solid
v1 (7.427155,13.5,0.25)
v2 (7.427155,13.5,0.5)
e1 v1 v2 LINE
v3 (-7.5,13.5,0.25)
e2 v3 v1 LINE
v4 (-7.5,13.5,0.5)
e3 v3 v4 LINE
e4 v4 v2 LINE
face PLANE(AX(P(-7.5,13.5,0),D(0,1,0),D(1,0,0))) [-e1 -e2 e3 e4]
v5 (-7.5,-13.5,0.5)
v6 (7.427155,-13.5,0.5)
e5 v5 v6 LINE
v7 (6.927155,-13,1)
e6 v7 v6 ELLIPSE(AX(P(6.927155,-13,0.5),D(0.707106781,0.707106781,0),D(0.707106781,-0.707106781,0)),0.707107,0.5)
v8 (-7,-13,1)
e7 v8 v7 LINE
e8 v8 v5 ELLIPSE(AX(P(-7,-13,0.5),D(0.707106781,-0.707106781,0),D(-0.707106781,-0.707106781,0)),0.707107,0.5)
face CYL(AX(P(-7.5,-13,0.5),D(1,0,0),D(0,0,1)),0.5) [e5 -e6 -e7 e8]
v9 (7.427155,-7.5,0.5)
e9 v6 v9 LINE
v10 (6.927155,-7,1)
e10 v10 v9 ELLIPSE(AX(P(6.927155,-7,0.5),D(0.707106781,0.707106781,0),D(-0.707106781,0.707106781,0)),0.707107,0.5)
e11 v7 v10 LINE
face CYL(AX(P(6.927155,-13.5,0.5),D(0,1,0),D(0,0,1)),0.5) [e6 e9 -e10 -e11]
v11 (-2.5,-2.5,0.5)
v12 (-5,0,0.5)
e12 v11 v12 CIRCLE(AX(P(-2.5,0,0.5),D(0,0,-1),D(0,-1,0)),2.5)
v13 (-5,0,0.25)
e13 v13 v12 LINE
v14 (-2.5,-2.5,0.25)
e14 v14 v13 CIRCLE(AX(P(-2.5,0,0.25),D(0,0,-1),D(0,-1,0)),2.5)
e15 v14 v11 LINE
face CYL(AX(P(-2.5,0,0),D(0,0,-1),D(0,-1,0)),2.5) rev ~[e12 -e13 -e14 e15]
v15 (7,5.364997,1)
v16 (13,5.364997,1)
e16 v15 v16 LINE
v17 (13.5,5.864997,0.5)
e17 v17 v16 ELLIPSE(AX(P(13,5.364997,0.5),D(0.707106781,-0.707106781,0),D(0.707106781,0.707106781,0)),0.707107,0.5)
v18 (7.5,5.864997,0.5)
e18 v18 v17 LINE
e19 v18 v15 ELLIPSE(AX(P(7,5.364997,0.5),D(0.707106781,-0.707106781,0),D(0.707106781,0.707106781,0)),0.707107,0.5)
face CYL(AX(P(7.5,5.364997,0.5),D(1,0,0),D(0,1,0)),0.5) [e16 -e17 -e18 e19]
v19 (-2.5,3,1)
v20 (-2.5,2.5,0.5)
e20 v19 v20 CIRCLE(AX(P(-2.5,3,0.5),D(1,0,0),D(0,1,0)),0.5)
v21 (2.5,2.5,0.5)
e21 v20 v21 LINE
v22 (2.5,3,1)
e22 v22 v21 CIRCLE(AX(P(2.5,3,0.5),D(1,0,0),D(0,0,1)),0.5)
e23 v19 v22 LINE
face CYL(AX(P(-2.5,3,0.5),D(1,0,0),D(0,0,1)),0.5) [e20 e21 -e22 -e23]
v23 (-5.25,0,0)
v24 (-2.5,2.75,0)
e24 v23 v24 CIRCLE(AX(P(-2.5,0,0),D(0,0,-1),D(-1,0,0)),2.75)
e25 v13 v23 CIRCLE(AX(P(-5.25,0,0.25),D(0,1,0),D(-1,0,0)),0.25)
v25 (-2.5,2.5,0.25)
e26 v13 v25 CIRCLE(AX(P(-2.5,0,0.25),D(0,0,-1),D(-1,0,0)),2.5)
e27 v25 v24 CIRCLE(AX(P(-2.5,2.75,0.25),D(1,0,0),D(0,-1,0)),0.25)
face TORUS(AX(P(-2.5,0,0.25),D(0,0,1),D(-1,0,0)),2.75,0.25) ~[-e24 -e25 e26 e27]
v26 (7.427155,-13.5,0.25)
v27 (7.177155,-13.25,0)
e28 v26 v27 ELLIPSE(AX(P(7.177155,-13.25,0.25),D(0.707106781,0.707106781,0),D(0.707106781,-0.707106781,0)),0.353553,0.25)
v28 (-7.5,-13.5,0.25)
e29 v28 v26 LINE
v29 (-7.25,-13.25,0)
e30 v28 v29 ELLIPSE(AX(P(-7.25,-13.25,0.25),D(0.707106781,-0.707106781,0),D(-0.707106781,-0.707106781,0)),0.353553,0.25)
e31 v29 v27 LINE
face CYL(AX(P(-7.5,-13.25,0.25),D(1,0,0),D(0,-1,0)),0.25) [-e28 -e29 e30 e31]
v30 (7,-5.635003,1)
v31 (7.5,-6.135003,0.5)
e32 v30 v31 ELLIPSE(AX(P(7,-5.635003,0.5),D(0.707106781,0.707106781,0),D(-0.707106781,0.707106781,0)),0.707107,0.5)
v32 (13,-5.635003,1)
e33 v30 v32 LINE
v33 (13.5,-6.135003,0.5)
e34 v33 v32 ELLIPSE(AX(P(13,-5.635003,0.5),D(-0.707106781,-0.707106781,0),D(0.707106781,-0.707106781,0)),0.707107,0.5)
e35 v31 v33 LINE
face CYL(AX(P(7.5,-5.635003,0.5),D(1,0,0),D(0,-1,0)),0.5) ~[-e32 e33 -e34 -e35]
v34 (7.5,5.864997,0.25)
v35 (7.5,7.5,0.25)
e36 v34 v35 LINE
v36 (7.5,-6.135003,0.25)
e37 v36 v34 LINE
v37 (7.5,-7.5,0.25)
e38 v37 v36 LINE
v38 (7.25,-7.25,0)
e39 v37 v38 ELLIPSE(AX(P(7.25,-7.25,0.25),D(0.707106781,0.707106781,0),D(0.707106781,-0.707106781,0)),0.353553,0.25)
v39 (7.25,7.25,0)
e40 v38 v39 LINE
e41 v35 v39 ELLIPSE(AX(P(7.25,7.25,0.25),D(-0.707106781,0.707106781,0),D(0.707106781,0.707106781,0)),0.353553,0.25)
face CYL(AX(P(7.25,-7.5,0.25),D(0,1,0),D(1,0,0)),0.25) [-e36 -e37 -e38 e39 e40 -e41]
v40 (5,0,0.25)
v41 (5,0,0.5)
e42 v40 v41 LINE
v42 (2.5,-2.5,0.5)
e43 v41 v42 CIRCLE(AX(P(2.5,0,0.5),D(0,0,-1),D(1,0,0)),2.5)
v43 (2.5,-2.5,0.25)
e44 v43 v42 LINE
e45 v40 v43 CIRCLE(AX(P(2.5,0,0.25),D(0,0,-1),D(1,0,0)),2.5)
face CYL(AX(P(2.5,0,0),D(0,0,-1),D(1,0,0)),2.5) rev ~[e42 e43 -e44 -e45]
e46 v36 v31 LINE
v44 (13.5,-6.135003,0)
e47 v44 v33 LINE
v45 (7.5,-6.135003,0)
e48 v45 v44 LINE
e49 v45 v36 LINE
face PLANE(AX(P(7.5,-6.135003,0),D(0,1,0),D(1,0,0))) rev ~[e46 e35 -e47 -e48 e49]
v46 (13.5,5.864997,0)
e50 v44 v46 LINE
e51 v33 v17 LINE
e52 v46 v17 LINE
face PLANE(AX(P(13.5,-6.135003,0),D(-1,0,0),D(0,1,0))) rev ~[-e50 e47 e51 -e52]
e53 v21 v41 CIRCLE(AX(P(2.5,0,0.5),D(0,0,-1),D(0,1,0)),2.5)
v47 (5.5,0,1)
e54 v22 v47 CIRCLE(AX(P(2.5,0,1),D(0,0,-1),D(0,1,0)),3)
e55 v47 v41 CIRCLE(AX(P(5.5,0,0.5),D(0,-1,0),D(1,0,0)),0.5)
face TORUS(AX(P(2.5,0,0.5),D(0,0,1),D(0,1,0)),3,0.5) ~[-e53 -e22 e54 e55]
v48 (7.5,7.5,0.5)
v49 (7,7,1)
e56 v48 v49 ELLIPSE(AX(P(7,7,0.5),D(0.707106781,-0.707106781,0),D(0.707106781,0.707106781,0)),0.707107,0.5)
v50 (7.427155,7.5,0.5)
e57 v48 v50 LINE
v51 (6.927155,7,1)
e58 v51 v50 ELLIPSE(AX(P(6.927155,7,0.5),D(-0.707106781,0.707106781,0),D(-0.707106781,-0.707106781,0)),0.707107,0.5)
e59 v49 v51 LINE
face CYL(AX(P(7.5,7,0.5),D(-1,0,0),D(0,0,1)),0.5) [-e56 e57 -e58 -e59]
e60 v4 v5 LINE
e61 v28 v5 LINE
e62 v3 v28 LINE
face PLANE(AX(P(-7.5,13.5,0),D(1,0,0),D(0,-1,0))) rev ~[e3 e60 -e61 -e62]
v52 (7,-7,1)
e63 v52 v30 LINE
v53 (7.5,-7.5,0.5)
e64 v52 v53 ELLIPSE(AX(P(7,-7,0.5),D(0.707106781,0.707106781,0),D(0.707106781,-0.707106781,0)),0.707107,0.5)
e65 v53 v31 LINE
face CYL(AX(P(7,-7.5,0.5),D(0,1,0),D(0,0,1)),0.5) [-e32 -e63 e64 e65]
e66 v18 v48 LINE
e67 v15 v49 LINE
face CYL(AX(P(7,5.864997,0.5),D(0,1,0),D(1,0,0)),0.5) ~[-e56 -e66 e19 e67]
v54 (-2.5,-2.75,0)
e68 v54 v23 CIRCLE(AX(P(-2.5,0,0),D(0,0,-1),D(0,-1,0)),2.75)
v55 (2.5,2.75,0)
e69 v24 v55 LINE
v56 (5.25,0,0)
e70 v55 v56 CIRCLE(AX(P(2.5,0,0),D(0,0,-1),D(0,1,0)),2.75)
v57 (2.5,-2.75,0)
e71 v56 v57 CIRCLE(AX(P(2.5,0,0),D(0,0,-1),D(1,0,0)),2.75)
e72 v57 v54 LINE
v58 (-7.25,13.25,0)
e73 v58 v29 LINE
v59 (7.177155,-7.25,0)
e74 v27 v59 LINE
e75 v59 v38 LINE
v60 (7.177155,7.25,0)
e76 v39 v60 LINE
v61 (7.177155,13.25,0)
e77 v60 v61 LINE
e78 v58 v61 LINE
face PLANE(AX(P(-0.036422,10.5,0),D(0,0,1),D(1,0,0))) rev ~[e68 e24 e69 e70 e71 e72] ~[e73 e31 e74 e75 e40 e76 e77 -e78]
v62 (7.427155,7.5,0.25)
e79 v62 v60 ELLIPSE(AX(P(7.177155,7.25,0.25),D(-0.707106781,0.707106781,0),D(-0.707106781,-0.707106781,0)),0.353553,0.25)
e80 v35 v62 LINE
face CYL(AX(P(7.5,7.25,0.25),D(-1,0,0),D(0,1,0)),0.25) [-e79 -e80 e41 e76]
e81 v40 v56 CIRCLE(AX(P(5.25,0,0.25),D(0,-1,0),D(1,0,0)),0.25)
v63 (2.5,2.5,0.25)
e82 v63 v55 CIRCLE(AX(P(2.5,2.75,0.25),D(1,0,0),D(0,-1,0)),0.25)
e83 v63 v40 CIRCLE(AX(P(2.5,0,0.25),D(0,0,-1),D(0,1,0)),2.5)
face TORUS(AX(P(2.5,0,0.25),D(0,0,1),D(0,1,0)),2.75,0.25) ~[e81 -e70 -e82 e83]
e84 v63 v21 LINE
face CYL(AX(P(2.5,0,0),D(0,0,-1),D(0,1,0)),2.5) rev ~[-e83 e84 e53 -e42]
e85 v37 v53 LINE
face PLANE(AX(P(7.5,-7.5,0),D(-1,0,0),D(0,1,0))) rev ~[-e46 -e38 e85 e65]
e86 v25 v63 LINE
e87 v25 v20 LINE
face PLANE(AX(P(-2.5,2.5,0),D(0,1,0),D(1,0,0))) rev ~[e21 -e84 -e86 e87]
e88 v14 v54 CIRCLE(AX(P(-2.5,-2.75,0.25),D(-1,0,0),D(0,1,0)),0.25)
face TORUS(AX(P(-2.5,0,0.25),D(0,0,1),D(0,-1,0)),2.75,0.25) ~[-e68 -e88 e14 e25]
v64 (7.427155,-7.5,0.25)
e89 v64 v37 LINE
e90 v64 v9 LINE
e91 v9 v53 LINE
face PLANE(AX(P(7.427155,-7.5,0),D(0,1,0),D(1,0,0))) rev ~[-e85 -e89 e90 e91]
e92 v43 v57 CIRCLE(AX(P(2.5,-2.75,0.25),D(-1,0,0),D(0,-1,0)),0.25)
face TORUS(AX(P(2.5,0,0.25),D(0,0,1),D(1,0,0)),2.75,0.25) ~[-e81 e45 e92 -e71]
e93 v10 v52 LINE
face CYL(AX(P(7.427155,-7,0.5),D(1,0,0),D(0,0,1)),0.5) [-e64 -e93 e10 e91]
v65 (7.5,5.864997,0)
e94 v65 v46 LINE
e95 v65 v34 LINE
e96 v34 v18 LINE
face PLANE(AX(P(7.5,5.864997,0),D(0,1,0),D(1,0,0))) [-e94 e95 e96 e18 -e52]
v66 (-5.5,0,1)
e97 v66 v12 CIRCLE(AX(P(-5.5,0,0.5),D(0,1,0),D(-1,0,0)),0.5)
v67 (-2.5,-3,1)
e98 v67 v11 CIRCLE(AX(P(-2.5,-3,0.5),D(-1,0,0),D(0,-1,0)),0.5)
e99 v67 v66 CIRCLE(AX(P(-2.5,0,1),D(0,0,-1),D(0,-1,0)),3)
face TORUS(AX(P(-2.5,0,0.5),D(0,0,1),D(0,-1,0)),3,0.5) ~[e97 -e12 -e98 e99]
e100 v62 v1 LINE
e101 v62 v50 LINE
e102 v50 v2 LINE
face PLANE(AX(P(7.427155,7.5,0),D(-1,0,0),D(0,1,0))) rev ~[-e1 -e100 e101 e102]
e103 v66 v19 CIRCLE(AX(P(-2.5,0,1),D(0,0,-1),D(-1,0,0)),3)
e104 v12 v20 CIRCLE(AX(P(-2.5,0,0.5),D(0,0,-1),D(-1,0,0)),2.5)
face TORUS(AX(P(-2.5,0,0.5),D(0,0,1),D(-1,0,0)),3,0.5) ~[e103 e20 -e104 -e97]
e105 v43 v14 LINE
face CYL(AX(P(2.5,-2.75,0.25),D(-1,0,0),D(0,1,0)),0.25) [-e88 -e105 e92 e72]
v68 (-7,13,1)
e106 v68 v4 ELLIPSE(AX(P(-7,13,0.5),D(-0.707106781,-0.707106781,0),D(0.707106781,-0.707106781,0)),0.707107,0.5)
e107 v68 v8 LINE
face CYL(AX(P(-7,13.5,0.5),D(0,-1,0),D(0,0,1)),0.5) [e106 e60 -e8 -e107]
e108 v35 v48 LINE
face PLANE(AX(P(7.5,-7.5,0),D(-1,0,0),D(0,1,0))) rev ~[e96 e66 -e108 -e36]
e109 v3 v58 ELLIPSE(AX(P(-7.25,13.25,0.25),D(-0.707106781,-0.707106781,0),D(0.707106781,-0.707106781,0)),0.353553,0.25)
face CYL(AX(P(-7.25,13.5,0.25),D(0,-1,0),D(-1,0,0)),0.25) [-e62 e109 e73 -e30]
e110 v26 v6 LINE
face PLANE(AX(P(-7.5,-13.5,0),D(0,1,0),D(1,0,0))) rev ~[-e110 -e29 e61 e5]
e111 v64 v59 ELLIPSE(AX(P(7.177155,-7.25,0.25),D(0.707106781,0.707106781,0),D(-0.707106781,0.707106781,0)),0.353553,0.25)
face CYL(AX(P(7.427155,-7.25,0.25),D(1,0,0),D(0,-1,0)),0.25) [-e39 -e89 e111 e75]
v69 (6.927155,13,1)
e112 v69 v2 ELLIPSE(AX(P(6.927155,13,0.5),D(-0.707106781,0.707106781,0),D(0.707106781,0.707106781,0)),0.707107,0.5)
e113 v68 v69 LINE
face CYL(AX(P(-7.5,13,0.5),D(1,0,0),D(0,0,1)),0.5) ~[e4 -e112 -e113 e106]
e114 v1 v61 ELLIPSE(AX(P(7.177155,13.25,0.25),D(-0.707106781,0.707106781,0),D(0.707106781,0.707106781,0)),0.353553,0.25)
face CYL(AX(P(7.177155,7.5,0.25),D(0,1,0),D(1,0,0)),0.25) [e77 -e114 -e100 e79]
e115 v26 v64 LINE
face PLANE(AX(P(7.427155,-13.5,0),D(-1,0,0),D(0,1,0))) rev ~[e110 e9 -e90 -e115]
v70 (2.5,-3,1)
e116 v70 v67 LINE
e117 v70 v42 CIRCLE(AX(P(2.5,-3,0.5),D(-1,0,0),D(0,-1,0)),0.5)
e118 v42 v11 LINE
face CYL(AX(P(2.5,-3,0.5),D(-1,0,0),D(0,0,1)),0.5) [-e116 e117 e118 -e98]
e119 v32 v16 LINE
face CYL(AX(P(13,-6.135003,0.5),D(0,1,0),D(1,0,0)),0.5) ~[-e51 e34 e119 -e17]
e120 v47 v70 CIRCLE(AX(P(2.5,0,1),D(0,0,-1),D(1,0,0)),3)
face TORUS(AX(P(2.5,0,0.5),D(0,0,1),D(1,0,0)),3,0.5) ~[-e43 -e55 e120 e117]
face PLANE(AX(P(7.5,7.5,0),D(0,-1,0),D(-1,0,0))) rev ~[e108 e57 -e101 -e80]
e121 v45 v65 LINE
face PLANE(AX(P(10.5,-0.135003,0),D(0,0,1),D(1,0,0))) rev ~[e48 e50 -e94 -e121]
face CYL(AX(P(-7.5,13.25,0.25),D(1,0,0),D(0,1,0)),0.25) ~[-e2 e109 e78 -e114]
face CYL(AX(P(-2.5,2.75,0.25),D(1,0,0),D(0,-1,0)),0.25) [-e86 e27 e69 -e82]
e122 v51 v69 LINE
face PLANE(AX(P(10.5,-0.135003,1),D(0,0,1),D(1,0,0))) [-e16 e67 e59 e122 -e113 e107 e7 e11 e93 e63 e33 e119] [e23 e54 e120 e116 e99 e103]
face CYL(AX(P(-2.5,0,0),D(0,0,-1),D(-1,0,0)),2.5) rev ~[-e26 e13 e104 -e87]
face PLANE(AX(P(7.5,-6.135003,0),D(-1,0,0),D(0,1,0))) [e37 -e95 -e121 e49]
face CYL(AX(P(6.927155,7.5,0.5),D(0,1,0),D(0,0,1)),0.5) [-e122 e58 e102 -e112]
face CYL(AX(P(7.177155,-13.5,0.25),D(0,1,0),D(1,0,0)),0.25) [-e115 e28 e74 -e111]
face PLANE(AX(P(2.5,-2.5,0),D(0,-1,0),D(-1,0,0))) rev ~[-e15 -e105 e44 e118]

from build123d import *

# Parameters (mm, degrees)
F0_W     = 14.9271550402
F0_H     = 6
F1_DEPTH = 1
F2_R     = 0.25
F3_DEPTH = 1
F0_W_2   = 6
F0_H_2   = 12
F4_DEPTH = 1
F5_R     = 0.5


# Not quite as in the source:
# - a feature names something its author has since deleted; it is built from what else it names


with BuildPart() as f1:
    # F0 (on Top) → F1 (new body)
    with BuildSketch(Plane.XY):
        with Locations((-0.0364224799, 10.5)):
            Rectangle(F0_W, F0_H)
        Polygon((7.4271550402, 7.5), (-7.5, 7.5), (-7.5, -7.5), (7.4271550402, -7.5), (7.5, -7.5), (7.5, -6.1350027099), (7.5, 5.8649972901), (7.5, 7.5), align=None)
        with BuildLine():
            ThreePointArc((-5, 0), (-4.267766953, 1.767766953), (-2.5, 2.5))
            Line((-2.5, 2.5), (2.5, 2.5))
            ThreePointArc((2.5, 2.5), (4.267766953, 1.767766953), (5, 0))
            ThreePointArc((5, 0), (4.267766953, -1.767766953), (2.5, -2.5))
            Line((2.5, -2.5), (-2.5, -2.5))
            ThreePointArc((-2.5, -2.5), (-4.267766953, -1.767766953), (-5, 0))
        make_face(mode=Mode.SUBTRACT)
        with Locations((-0.0364224799, -10.5)):
            Rectangle(F0_W, F0_H)
    extrude(amount=F1_DEPTH)

    # F2
    f2_edges = [f1.edges().sort_by_distance(p)[0] for p in [
        (-0.036422, 13.5, 0),
        (-7.5, 0, 0),
        (-0.036422, -13.5, 0),
        (7.427155, -10.5, 0),
        (7.463578, -7.5, 0),
        (7.5, 0, 0),
        (7.463578, 7.5, 0),
        (7.427155, 10.5, 0),
        (-5, 0, 0),
        (0, 2.5, 0),
        (5, 0, 0),
        (0, -2.5, 0),
    ]]
    fillet(f2_edges, radius=F2_R)

    # F0 (on Top) → F3 (cut)
    with BuildSketch(Plane.XY):
        with BuildLine():
            Line((2.5, 2.5), (-2.5, 2.5))
            ThreePointArc((-2.5, 2.5), (-4.267766953, 1.767766953), (-5, 0))
            ThreePointArc((-5, 0), (-4.267766953, -1.767766953), (-2.5, -2.5))
            Line((-2.5, -2.5), (2.5, -2.5))
            ThreePointArc((2.5, -2.5), (4.267766953, -1.767766953), (5, 0))
            ThreePointArc((5, 0), (4.267766953, 1.767766953), (2.5, 2.5))
        make_face()
    extrude(amount=F3_DEPTH, mode=Mode.SUBTRACT)

    # F0 (on Top) → F4 (join)
    with BuildSketch(Plane.XY):
        with Locations((10.5, -0.1350027099)):
            Rectangle(F0_W_2, F0_H_2)
    extrude(amount=F4_DEPTH)

    # F5
    f5_edges = [f1.edges().sort_by_distance(p)[0] for p in [
        (-0.036422, 13.5, 1),
        (-7.5, 0, 1),
        (-0.036422, -13.5, 1),
        (7.427155, -10.5, 1),
        (7.463578, -7.5, 1),
        (7.5, -6.817501, 1),
        (10.5, -6.135003, 1),
        (13.5, -0.135003, 1),
        (10.5, 5.864997, 1),
        (7.5, 6.682499, 1),
        (7.463578, 7.5, 1),
        (7.427155, 10.5, 1),
        (-5, 0, 1),
        (0, 2.5, 1),
        (5, 0, 1),
        (0, -2.5, 1),
    ]]
    fillet(f5_edges, radius=F5_R)


solid = f1.part
